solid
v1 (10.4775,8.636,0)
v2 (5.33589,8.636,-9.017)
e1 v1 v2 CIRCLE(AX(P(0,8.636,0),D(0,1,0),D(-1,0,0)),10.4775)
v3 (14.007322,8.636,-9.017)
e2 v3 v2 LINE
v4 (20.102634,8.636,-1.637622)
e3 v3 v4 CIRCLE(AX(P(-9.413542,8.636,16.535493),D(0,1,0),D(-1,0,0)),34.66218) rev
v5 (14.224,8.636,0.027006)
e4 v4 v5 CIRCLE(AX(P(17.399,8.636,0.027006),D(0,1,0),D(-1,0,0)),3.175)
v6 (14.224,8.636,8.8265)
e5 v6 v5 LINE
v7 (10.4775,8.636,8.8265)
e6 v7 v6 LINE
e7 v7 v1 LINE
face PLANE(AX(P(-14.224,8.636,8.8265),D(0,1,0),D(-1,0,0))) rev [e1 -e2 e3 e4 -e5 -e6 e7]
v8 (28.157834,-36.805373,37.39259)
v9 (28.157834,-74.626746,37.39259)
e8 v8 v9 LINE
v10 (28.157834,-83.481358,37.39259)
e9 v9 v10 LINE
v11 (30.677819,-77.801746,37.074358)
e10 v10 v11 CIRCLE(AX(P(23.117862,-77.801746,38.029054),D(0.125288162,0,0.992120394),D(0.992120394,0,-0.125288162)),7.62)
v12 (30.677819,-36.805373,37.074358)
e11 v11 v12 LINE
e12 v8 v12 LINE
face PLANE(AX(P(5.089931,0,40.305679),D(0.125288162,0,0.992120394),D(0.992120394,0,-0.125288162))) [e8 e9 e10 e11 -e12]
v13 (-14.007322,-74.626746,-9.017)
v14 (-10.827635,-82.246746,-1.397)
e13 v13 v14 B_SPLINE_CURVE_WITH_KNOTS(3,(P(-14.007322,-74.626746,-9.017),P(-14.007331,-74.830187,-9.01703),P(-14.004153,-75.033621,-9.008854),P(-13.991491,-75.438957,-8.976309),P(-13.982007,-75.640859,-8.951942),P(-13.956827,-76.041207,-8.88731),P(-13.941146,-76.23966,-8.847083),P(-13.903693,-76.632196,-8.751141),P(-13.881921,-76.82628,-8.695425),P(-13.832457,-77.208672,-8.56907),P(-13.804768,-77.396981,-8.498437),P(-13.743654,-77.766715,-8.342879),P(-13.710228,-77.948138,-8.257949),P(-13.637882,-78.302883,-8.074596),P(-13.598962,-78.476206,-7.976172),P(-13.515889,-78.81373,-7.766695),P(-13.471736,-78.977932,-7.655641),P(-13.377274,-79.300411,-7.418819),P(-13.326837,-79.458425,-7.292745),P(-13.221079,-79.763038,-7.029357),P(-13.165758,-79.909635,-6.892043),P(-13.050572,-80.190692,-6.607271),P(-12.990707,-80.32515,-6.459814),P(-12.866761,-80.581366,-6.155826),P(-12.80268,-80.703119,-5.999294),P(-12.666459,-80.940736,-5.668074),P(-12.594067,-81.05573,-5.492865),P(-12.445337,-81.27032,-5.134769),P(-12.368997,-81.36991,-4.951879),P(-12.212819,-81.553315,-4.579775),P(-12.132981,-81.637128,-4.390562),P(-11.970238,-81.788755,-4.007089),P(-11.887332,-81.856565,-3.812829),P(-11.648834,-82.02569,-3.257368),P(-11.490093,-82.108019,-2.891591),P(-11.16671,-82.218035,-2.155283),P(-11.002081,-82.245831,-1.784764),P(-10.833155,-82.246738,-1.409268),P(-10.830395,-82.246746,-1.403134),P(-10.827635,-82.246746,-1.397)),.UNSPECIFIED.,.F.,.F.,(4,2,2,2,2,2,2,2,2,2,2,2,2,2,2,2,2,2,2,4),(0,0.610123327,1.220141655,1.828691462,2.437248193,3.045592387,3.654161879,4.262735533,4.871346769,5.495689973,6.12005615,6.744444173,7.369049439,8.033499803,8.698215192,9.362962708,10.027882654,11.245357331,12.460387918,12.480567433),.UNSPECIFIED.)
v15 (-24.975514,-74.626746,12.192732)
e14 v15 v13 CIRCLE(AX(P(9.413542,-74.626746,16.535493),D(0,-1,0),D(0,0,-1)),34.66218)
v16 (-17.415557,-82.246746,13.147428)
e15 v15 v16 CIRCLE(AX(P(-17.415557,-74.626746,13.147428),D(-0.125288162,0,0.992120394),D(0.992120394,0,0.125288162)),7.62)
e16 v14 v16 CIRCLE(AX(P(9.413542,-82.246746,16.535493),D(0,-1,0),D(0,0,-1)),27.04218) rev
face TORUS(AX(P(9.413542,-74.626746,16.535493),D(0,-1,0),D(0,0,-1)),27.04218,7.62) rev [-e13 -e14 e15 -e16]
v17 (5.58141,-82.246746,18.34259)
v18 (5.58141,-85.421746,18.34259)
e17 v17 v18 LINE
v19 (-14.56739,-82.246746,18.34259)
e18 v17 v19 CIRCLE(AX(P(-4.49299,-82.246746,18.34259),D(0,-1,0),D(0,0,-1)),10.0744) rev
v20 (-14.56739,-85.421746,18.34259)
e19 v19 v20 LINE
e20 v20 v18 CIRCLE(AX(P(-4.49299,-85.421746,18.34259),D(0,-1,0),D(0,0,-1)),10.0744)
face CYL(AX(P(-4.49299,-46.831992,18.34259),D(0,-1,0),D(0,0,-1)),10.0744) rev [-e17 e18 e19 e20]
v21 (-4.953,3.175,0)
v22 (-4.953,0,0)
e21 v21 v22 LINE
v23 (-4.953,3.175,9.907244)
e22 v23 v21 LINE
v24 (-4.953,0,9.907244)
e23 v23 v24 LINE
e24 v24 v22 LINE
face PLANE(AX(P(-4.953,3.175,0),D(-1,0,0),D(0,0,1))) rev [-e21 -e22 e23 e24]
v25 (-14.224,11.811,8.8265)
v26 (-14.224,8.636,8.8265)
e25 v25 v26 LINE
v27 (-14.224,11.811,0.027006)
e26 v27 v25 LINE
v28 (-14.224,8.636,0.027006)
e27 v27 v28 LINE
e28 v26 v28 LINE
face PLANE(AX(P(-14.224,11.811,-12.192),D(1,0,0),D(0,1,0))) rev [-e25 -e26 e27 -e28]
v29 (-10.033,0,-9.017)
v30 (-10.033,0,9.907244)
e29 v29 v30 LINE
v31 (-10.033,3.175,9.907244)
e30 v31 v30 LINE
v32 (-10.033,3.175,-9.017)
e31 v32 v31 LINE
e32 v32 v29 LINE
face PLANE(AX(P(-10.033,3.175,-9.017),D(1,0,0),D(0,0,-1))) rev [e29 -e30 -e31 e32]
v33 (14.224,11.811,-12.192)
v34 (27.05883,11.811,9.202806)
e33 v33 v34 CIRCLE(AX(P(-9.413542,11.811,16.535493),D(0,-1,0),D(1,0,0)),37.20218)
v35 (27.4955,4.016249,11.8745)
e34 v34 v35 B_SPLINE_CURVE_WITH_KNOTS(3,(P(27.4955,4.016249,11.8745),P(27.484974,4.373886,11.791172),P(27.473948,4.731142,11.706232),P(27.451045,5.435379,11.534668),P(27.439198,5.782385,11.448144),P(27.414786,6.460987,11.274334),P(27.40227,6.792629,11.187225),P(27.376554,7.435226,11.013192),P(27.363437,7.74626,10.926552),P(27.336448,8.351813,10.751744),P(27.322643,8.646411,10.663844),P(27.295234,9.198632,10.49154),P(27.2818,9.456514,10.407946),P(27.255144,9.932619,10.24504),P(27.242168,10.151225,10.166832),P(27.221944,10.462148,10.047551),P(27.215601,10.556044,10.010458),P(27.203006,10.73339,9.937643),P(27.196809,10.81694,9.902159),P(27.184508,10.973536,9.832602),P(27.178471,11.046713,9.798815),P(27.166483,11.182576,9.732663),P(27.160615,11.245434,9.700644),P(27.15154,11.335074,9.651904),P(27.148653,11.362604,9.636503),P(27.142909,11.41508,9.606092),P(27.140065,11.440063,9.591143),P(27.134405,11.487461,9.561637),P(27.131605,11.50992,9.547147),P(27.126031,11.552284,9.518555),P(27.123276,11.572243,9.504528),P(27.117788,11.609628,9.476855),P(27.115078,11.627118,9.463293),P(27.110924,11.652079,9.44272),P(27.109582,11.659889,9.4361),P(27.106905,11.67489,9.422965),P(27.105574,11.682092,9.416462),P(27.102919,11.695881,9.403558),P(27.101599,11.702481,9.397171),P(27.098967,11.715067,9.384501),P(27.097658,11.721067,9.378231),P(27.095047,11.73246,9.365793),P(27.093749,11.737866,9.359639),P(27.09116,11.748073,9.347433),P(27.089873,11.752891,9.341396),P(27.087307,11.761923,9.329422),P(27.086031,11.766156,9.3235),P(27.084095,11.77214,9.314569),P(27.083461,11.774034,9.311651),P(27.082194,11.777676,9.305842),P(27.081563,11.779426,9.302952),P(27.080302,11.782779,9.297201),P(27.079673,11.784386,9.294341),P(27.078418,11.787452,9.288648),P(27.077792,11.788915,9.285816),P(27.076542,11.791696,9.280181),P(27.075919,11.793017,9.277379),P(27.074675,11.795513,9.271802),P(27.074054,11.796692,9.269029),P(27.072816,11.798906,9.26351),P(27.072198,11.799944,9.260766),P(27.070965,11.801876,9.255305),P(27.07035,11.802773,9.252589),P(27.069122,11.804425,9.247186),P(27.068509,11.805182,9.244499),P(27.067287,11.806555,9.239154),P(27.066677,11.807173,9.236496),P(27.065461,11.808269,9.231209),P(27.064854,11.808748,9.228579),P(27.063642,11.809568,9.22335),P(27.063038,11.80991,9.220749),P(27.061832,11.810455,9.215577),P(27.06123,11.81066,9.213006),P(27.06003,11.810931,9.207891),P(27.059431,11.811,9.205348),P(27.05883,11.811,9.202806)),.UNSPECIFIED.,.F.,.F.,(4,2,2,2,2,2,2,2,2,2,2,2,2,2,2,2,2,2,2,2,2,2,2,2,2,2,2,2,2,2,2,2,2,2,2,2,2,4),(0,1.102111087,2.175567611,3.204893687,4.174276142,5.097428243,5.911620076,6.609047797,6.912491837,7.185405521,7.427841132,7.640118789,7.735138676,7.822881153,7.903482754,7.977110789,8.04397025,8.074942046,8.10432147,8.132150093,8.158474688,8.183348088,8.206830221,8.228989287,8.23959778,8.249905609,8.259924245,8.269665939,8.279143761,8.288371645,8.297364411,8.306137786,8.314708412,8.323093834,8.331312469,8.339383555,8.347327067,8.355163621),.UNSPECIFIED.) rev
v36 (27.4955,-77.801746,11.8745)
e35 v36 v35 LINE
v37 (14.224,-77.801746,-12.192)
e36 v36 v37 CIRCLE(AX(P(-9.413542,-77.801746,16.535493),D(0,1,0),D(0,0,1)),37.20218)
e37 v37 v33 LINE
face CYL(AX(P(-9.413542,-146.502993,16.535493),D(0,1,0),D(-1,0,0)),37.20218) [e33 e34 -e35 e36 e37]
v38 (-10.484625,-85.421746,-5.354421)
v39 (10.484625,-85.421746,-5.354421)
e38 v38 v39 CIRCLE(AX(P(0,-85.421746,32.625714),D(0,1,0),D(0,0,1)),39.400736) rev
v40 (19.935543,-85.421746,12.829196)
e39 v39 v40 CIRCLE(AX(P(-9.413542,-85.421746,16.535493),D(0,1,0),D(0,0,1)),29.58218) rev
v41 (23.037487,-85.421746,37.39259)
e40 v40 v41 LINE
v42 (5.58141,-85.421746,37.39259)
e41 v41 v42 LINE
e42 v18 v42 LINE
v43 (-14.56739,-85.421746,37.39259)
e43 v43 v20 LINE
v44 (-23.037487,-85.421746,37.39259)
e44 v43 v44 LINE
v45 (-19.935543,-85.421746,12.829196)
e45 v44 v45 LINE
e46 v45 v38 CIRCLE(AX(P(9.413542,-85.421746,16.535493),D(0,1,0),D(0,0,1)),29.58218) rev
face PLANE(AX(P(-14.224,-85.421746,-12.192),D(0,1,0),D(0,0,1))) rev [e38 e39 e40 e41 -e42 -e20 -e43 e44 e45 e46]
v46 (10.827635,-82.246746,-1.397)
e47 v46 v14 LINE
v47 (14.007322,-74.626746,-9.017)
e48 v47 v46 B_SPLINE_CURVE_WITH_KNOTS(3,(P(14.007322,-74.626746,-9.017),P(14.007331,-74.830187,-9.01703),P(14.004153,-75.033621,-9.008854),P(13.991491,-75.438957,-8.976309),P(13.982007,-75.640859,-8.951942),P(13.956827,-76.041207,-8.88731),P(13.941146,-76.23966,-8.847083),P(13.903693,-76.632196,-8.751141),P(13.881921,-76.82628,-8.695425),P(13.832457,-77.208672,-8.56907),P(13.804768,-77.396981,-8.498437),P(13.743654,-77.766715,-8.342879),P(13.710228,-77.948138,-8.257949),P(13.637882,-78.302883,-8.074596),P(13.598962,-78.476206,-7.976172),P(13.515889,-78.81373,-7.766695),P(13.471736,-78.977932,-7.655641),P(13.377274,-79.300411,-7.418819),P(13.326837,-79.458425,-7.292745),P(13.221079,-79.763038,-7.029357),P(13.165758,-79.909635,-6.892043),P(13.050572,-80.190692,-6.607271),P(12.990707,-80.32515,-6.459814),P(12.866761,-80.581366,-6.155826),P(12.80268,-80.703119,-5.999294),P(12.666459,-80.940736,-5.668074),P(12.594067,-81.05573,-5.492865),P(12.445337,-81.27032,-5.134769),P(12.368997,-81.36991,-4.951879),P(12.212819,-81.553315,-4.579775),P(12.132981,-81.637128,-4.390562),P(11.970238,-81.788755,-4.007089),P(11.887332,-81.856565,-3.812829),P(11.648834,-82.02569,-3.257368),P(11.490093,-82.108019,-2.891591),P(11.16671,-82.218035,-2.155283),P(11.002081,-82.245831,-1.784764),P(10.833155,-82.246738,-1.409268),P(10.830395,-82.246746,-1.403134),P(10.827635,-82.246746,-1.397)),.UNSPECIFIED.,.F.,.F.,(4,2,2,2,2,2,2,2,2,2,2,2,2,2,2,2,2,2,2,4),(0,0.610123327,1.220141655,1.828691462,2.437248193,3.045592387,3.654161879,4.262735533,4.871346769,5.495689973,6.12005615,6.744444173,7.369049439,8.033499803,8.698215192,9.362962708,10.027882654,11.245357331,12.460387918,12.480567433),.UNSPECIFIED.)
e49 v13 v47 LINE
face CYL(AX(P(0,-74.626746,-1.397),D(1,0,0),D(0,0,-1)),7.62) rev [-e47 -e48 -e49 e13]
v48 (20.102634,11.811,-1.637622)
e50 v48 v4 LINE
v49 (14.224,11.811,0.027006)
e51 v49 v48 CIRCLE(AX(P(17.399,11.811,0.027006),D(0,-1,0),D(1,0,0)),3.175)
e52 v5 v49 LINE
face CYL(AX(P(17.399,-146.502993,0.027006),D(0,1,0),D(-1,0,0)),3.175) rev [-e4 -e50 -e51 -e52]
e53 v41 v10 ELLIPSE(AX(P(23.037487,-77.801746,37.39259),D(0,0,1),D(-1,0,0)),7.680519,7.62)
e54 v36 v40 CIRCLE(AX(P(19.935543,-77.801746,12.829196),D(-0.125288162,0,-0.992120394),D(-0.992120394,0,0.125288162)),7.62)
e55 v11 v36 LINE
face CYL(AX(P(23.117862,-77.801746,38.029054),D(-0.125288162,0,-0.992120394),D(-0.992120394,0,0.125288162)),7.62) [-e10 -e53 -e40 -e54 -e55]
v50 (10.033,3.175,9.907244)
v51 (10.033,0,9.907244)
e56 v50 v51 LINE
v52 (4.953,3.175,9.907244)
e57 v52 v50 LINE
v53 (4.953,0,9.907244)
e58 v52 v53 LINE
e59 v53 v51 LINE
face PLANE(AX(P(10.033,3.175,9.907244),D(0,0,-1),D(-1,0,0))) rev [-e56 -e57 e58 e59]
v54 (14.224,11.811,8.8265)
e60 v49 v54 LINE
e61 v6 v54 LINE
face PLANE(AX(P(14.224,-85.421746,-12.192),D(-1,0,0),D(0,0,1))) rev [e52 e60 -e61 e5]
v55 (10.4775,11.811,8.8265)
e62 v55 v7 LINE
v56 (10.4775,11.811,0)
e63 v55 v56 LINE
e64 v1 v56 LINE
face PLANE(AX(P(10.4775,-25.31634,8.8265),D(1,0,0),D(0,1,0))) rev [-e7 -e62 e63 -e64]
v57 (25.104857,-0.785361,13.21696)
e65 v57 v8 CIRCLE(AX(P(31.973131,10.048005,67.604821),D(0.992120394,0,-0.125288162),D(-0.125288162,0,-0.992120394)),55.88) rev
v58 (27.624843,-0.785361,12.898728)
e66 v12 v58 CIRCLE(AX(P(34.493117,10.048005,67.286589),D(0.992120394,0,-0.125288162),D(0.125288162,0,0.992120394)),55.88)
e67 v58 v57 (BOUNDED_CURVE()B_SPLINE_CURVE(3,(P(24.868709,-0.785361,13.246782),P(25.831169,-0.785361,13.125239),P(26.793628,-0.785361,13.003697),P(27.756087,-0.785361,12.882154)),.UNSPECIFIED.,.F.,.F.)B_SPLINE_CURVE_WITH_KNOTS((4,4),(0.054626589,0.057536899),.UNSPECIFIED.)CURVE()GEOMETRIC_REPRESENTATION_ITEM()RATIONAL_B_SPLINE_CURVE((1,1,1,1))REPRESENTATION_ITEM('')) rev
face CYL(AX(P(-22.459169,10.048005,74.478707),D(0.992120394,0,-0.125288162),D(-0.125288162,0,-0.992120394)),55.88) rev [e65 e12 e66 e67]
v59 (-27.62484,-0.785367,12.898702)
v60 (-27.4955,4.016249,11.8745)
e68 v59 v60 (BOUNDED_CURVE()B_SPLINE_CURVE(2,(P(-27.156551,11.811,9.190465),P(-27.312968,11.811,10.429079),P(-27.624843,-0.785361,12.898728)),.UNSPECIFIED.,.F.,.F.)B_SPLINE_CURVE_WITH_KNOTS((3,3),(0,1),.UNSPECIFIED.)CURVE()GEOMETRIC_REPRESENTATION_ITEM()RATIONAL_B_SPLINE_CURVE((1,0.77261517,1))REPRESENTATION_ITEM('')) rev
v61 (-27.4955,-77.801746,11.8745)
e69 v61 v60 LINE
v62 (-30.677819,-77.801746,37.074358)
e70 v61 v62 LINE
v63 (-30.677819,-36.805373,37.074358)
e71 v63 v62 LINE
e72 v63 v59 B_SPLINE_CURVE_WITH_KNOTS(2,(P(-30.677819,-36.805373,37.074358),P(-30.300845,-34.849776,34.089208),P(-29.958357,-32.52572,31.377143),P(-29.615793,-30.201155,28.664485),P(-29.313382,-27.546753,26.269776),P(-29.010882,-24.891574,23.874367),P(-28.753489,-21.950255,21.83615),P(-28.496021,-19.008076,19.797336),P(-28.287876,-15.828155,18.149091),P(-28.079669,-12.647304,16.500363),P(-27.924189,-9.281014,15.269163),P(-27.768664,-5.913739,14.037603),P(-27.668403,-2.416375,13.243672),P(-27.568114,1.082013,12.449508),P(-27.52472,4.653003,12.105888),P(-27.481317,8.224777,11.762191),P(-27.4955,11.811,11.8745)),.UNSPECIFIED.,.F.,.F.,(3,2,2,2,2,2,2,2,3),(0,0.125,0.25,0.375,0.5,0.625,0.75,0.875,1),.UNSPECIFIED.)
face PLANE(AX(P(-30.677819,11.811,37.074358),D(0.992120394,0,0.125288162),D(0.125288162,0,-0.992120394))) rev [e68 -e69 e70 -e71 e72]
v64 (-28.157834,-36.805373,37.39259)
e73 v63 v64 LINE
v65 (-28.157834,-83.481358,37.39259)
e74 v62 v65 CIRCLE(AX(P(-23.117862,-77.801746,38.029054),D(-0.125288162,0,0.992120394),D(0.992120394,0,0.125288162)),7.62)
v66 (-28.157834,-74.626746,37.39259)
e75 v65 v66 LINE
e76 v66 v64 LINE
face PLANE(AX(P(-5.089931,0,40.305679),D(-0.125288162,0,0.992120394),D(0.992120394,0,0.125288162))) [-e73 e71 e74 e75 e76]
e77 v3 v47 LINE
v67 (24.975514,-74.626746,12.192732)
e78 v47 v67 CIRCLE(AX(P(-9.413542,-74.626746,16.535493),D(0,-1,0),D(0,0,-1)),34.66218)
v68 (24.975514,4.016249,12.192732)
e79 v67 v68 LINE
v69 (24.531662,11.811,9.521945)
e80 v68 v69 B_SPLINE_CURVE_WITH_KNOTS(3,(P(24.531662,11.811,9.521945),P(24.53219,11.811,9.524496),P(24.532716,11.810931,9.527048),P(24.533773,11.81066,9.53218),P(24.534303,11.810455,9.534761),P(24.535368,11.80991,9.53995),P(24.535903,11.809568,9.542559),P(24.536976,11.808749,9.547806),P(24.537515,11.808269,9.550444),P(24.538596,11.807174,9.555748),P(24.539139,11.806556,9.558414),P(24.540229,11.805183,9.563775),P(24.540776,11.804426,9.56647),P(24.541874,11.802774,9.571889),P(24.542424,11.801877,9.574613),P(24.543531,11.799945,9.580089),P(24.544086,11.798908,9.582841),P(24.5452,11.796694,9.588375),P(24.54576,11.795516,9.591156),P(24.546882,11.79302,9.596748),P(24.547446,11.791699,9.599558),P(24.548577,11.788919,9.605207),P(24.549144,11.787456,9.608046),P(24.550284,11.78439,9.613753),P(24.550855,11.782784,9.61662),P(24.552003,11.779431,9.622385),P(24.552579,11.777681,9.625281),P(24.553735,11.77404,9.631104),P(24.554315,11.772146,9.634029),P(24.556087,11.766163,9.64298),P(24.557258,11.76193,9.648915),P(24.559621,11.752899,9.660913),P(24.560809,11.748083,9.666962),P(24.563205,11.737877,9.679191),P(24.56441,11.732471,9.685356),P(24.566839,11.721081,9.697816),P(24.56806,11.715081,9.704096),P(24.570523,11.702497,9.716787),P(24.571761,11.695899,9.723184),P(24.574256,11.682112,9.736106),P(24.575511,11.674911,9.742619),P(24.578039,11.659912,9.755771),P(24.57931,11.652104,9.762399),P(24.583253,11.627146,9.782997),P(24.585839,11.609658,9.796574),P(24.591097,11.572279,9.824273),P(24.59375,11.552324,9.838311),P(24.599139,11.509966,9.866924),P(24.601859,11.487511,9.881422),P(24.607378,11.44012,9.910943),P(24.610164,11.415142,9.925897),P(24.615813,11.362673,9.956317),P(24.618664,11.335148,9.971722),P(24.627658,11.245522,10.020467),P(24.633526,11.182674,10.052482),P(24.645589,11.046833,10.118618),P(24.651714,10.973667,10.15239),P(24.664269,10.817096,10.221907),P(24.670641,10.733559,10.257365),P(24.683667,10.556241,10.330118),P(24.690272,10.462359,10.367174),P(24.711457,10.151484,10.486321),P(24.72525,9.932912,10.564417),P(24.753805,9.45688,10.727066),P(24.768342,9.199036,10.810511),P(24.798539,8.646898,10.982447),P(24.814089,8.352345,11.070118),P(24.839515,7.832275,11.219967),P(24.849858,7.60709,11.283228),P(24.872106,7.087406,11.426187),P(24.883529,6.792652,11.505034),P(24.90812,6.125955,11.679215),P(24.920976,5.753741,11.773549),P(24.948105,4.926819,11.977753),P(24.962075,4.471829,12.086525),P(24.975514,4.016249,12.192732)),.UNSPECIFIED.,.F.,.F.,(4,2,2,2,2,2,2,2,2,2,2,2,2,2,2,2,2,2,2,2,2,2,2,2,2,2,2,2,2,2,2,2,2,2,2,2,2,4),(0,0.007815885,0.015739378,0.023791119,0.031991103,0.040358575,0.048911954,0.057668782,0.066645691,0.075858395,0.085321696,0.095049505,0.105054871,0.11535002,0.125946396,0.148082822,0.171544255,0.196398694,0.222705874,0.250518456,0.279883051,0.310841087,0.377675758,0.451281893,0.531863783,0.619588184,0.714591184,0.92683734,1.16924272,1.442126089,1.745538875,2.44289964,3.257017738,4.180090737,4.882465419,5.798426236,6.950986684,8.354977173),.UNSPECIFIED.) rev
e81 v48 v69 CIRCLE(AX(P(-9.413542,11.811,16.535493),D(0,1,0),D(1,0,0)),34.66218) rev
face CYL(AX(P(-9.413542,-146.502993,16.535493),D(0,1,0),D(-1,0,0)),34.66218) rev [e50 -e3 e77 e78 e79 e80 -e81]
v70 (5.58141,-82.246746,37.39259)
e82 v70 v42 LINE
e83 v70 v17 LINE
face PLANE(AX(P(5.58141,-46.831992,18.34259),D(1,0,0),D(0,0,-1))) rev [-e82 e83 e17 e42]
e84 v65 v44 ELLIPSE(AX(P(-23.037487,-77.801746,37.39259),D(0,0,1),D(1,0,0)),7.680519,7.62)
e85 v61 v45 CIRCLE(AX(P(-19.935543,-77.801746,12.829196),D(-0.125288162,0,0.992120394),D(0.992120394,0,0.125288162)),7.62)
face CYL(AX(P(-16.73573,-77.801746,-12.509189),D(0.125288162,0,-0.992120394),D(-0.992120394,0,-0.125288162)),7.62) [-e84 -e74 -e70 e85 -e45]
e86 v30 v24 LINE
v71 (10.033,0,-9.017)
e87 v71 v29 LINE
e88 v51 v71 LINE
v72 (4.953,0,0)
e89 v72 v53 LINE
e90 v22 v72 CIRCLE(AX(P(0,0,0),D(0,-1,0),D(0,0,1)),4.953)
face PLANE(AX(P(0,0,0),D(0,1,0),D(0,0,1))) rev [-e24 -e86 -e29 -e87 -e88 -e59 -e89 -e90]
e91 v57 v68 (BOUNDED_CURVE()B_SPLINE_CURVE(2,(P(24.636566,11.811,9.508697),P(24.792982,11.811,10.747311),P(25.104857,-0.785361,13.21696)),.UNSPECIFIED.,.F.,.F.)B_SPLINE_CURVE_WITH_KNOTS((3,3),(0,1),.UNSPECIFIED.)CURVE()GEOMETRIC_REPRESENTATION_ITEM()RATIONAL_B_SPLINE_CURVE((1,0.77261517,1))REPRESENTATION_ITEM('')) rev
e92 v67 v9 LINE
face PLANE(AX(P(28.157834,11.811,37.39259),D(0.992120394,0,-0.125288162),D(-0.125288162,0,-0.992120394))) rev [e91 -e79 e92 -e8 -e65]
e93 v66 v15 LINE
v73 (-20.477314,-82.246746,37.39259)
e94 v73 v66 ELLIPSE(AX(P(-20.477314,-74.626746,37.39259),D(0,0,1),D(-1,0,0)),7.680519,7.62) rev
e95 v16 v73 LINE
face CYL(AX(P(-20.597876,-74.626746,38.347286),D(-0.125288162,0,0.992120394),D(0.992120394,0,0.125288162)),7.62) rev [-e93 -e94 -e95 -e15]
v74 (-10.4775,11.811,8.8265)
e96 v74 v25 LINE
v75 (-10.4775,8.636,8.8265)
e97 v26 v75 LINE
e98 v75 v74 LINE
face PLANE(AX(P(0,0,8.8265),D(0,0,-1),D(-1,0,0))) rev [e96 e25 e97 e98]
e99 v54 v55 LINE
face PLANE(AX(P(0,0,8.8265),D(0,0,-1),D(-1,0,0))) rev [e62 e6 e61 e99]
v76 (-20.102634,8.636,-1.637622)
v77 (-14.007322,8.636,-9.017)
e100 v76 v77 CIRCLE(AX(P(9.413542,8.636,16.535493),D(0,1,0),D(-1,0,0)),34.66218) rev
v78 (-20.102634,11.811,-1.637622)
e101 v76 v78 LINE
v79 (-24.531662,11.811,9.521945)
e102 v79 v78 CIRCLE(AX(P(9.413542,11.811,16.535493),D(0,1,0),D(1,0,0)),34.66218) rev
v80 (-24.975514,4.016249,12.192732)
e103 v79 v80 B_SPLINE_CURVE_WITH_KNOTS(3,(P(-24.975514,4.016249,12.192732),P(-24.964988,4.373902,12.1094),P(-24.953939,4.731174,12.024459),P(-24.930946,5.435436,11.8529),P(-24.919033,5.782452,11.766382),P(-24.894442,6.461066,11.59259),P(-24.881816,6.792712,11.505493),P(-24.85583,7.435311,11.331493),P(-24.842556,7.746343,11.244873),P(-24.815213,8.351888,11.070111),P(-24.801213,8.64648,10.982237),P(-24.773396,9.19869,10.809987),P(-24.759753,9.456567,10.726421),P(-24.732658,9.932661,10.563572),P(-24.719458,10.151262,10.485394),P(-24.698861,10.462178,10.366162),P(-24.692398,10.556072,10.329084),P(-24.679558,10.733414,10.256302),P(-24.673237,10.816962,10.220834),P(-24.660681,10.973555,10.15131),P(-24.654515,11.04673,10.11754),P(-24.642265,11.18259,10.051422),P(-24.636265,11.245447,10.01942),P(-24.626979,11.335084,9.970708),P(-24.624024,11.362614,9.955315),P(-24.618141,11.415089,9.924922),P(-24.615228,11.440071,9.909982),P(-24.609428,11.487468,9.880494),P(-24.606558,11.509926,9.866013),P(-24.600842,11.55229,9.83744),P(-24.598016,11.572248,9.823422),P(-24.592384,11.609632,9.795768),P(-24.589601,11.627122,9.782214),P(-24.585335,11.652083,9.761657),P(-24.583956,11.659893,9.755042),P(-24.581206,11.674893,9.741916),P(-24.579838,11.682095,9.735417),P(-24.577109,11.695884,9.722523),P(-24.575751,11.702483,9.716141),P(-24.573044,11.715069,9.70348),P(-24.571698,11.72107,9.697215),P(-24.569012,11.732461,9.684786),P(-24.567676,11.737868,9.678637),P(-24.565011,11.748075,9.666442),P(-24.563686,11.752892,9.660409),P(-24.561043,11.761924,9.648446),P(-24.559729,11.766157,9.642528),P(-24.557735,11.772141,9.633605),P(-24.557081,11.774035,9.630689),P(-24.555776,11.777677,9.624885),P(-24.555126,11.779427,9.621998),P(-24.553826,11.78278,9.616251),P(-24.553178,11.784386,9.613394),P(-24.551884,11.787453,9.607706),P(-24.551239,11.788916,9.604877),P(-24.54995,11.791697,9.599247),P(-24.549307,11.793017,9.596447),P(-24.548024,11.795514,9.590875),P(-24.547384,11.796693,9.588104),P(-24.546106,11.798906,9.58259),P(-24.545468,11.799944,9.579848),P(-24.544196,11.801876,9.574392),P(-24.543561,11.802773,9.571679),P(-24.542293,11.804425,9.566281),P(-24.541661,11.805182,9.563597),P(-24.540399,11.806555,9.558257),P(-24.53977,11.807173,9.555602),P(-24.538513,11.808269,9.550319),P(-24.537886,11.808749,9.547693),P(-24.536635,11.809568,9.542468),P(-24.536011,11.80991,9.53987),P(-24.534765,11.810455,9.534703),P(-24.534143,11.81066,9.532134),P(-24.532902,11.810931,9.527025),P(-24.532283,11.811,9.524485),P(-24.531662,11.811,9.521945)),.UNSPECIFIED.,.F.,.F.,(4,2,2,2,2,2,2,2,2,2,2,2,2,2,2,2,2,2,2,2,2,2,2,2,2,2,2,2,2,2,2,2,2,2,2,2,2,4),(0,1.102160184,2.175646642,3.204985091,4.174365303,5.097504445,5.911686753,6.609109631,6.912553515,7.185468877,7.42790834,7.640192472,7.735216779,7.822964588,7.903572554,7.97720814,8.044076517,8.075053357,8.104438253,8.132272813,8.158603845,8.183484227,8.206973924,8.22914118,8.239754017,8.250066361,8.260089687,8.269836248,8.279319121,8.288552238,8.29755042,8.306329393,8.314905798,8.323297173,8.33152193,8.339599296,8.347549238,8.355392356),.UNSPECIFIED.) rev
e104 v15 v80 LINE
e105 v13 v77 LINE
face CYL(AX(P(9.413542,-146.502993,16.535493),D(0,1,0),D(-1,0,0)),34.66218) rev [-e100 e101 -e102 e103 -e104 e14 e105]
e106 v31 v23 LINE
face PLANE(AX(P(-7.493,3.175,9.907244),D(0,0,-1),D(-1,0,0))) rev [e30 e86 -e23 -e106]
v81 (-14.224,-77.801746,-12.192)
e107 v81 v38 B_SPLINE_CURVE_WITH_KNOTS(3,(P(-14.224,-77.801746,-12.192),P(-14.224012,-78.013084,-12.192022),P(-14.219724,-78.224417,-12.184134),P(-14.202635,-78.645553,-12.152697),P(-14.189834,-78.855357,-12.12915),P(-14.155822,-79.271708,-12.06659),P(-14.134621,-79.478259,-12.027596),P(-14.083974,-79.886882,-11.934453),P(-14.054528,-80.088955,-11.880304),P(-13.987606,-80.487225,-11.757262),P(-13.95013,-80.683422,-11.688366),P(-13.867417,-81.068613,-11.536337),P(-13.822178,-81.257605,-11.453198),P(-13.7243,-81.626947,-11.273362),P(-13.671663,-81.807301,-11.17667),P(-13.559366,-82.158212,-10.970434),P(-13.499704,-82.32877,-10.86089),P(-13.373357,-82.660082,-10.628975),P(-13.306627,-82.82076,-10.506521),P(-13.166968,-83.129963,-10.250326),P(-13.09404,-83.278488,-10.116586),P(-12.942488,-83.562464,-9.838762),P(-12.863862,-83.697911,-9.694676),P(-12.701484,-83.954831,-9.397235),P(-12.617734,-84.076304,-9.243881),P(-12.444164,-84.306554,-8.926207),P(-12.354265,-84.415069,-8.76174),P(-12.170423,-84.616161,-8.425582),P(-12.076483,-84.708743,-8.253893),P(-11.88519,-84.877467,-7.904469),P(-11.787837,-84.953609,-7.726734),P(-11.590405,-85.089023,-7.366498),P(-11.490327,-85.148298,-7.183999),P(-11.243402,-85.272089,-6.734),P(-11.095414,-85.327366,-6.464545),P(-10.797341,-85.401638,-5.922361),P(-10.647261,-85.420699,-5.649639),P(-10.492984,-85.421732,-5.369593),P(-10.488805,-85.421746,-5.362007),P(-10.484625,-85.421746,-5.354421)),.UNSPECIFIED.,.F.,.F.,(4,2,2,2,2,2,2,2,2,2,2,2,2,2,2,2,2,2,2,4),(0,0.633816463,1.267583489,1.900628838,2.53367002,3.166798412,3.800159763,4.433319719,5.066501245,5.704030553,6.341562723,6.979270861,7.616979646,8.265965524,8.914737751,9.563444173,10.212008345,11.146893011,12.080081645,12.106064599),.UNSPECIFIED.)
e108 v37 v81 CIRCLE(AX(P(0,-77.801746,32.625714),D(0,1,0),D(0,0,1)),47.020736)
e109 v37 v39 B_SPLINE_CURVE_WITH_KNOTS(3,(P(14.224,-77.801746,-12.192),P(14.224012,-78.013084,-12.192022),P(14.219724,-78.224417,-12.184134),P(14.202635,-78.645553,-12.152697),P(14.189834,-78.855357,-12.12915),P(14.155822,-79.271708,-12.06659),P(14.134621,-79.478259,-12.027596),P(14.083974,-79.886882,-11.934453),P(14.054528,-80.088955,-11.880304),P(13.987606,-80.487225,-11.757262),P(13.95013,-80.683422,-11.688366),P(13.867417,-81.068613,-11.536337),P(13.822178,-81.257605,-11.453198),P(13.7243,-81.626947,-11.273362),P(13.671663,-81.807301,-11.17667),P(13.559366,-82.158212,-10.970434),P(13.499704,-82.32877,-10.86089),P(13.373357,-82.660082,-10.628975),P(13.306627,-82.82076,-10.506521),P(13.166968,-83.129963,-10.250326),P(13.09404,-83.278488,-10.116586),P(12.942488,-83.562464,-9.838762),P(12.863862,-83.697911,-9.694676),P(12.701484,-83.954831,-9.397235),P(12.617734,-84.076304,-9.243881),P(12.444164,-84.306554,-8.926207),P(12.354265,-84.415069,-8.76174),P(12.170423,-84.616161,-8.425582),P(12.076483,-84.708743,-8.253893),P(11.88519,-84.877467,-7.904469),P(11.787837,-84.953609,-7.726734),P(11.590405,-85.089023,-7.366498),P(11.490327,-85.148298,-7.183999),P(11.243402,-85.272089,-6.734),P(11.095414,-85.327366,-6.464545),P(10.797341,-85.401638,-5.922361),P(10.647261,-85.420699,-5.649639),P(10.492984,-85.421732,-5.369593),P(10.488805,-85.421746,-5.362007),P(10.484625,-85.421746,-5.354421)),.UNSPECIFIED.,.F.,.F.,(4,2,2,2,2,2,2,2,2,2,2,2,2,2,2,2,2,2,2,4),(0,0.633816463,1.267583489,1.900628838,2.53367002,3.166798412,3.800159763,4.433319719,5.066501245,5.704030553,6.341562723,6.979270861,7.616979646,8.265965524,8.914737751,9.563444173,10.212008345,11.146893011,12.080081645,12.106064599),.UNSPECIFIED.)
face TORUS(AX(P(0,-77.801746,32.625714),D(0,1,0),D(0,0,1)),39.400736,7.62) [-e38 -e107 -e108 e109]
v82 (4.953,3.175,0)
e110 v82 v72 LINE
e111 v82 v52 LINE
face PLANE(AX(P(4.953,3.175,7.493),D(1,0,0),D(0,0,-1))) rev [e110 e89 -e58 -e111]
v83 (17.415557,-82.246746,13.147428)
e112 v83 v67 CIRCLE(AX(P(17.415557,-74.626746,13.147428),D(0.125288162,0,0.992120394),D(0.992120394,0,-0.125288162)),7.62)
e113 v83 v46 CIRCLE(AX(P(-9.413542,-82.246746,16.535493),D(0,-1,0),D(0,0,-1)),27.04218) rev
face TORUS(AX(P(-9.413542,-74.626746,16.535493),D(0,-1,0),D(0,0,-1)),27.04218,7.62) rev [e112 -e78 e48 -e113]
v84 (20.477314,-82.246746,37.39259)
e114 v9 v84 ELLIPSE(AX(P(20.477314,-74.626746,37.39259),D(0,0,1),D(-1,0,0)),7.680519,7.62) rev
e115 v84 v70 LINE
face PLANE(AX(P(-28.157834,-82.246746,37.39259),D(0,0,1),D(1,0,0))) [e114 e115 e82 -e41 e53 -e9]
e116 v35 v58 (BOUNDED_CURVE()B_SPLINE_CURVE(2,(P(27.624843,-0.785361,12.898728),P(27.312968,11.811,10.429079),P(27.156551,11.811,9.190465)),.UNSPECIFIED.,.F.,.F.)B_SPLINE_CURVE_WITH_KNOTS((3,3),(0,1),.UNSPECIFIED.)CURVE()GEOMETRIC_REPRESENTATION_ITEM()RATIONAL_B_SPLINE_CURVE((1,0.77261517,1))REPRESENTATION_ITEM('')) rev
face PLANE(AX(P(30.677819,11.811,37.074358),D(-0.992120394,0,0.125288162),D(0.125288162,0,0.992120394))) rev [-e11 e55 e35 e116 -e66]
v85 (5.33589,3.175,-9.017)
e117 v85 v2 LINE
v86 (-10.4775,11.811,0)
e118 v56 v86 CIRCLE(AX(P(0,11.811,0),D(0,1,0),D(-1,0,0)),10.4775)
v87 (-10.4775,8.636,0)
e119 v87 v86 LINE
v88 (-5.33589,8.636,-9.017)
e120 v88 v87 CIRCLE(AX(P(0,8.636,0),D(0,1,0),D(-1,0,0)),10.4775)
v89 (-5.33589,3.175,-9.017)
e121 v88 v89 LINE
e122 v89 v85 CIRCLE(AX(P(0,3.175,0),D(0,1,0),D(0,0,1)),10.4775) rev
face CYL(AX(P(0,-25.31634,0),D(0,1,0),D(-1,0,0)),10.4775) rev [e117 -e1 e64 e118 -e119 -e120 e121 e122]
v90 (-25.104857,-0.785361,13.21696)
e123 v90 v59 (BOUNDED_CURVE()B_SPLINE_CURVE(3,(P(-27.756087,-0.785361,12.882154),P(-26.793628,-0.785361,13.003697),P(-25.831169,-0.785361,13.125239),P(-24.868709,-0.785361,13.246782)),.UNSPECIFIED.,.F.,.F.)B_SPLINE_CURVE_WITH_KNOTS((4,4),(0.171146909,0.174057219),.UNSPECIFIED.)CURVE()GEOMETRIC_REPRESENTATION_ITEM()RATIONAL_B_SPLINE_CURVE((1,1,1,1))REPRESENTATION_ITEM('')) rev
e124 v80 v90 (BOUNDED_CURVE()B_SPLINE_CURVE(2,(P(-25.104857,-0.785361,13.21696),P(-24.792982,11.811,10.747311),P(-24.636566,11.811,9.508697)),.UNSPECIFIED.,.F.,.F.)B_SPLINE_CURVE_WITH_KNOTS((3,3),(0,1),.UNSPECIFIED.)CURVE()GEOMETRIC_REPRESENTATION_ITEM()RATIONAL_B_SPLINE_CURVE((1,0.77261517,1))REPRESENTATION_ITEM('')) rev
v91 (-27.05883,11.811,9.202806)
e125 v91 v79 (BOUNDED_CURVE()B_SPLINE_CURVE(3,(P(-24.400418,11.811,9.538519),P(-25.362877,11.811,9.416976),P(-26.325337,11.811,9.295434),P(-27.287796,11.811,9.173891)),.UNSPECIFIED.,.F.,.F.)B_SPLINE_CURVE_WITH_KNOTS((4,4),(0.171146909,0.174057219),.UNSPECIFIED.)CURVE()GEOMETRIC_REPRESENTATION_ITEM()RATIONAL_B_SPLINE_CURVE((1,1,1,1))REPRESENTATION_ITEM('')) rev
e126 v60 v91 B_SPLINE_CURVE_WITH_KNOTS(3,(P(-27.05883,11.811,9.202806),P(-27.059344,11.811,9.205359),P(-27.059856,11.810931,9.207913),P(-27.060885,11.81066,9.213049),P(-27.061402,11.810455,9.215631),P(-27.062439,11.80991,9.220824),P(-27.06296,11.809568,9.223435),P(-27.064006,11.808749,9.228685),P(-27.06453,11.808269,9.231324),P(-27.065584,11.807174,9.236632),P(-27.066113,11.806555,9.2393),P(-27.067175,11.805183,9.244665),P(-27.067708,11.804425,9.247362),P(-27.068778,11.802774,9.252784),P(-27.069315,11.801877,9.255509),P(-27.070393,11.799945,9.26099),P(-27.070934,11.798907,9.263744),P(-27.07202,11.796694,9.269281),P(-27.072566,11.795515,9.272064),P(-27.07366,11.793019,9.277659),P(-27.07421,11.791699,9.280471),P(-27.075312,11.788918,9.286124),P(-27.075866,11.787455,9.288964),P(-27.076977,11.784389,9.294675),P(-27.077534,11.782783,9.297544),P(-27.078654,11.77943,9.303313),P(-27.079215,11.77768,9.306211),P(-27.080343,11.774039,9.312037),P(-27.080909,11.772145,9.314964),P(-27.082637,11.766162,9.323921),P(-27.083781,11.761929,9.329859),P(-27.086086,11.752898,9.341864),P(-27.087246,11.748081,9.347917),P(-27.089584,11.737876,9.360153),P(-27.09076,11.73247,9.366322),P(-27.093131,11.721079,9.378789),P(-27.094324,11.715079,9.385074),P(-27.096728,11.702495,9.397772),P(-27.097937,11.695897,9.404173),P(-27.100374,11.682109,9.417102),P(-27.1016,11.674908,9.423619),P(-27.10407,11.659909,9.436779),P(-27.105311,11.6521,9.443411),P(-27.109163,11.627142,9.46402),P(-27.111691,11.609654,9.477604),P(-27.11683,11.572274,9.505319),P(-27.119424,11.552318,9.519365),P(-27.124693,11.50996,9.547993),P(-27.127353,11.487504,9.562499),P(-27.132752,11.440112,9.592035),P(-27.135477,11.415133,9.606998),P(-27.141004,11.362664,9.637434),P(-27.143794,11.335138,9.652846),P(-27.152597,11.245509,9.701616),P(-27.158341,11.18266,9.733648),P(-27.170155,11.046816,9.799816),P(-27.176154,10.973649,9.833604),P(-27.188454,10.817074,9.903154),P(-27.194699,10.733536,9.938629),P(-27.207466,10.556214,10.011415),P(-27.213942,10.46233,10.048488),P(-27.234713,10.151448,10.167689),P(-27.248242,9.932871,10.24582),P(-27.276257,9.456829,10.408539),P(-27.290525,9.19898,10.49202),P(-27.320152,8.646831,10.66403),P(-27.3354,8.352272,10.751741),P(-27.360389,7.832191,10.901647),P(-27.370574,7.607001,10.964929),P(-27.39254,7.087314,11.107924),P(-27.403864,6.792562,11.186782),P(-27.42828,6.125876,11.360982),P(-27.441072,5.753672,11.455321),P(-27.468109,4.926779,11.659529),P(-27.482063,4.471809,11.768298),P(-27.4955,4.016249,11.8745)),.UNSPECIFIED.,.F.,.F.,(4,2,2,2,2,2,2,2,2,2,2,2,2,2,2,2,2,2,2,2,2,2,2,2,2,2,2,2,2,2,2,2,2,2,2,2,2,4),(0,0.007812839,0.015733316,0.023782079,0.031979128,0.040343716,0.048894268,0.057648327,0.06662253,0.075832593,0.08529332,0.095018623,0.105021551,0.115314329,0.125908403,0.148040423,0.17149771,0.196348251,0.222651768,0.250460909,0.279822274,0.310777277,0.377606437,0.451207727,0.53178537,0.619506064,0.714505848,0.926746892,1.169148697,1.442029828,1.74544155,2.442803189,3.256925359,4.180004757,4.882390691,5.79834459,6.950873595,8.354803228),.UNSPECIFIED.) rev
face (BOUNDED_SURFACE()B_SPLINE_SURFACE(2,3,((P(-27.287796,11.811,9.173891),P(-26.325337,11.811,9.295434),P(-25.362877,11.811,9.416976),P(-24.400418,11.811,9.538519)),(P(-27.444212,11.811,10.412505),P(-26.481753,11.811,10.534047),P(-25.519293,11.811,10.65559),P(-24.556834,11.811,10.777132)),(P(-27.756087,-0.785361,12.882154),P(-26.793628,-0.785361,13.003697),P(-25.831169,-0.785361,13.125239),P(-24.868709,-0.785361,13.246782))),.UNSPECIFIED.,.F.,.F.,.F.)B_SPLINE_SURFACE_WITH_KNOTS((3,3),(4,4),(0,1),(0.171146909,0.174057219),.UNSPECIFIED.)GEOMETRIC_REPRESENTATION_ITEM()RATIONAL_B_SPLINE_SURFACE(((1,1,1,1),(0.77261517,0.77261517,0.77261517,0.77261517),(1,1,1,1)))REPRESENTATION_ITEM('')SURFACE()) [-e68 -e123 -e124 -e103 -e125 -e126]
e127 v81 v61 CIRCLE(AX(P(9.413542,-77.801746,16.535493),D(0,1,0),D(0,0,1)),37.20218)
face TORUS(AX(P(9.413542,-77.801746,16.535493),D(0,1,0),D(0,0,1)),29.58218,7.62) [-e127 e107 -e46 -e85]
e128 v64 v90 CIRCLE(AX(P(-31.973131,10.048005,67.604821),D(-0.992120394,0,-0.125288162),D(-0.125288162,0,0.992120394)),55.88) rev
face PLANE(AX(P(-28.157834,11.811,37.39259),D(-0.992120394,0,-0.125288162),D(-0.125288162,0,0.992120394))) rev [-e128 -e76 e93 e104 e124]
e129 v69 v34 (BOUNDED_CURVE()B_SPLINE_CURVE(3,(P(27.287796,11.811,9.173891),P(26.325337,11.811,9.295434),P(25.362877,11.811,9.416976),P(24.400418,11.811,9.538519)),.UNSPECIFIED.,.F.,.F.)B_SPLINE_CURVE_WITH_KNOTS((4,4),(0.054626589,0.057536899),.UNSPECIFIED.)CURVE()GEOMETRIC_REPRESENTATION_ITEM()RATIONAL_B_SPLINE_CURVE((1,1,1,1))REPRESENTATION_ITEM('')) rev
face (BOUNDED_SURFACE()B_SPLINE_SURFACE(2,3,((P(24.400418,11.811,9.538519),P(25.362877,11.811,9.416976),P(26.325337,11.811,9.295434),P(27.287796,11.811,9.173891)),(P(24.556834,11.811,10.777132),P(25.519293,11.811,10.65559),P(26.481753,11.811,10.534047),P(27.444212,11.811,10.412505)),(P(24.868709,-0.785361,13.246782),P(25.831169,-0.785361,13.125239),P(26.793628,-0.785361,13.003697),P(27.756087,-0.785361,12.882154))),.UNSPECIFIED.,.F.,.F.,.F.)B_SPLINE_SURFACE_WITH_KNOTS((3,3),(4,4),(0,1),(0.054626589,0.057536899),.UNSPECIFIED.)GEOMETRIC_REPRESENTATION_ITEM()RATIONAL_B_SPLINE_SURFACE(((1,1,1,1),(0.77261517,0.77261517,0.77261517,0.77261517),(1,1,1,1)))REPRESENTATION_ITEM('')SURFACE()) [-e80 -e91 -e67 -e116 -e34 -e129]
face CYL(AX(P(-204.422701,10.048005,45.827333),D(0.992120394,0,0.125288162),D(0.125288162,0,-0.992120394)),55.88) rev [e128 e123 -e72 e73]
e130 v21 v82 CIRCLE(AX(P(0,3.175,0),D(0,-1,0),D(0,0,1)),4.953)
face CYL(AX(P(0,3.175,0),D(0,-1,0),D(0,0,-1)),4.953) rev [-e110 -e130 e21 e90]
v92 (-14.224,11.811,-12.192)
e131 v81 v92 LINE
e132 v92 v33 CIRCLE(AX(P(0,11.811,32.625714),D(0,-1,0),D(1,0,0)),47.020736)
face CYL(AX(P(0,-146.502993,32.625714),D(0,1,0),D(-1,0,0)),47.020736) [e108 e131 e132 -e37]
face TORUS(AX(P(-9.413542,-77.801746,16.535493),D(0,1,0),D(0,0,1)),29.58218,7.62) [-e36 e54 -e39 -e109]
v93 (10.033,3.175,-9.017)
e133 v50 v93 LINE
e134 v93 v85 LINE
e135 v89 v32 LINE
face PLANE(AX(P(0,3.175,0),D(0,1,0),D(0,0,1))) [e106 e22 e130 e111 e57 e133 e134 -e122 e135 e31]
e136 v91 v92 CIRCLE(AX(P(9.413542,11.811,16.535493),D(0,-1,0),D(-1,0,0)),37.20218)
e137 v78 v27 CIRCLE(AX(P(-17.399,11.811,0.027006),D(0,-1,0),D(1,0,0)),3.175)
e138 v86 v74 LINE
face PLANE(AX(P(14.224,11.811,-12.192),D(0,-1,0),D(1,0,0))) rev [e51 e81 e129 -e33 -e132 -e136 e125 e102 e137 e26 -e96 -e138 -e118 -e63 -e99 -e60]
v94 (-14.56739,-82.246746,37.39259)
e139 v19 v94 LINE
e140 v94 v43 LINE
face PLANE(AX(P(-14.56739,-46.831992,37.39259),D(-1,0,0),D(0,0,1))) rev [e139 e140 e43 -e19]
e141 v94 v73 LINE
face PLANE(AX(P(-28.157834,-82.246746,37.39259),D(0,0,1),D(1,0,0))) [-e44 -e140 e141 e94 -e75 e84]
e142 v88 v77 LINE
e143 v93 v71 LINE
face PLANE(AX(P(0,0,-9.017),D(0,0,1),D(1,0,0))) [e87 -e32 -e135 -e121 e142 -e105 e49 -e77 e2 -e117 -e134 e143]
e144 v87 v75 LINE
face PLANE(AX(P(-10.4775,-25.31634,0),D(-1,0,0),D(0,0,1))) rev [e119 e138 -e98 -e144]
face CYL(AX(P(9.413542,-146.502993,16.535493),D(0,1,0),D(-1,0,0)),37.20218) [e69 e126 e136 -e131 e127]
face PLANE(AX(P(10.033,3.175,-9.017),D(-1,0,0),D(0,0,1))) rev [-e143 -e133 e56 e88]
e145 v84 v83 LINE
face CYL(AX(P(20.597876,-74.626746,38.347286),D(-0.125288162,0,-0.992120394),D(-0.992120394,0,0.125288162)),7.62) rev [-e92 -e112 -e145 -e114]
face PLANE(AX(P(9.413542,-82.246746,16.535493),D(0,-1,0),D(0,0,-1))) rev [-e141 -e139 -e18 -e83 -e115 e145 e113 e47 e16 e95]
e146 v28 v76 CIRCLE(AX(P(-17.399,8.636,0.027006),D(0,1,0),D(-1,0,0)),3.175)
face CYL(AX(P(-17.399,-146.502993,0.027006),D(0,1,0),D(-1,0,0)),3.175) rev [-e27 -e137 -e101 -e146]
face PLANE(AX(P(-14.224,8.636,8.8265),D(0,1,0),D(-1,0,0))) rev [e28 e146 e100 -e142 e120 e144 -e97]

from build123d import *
from build123d.topology import SkipClean

# Parameters (mm, degrees)
BOSS_EXTRUDE1_DEPTH     = 3.175
BOSS_EXTRUDE2_DEPTH     = 3.175
BOSS_EXTRUDE3_DEPTH     = 21.0185
CUT_EXTRUDE1_START      = -8.636
CUT_EXTRUDE1_DEPTH      = 8.636
EXTRUDE_THIN2_START     = -97.232746
EXTRUDE_THIN2_DEPTH     = 97.232746
FILLET3_R               = 3.175
BOSS_EXTRUDE6_DEPTH     = 3.175
BOSS_EXTRUDE7_DEPTH     = 25.4
BOSS_EXTRUDE8_DEPTH     = 25.4
CUT_EXTRUDE2_START      = -2.540011
CUT_EXTRUDE2_DEPTH      = 2.540011
CUT_EXTRUDE3_DEPTH      = 111.05910553505677
CUT_EXTRUDE3_DEPTH_BACK = 10.921999999999981
BOSS_EXTRUDE10_DEPTH    = 3.175
CUT_EXTRUDE6_DEPTH      = 3.175
FILLET9_R               = 7.62
FILLET10_R              = 7.62


with BuildPart() as part:
    # Sketch1 → Boss-Extrude1 (new body)
    with BuildSketch(Plane(origin=(0, 0, 0), x_dir=(1, 0, 0), z_dir=(0, 1, 0))):
        with BuildLine():
            Line((-7.493000000000001, 9.017), (7.493000000000001, 9.017))
            Line((7.493000000000001, 9.017), (10.033000000000001, 9.017))
            Line((10.033000000000001, 9.017), (10.033000000000003, -9.907244149147685))
            Line((10.033000000000003, -9.907244149147685), (7.493000000000001, -9.907244149147685))
            Line((7.493000000000001, -9.907244149147685), (4.953000000000001, -9.907244149147685))
            Line((4.953000000000001, -9.907244149147685), (4.953000000000001, -7.493000000000001))
            Line((4.953000000000001, -7.493000000000001), (4.953000000000002, 0))
            ThreePointArc((4.953000000000002, 0), (3e-16, 4.953000000000002), (-4.953000000000002, 0))
            Line((-4.953000000000002, 0), (-4.953000000000002, -7.493000000000001))
            Line((-4.953000000000002, -7.493000000000001), (-4.953000000000002, -9.907244149147685))
            Line((-4.953000000000002, -9.907244149147685), (-7.493000000000001, -9.907244149147685))
            Line((-7.493000000000001, -9.907244149147685), (-10.033, -9.907244149147685))
            Line((-10.033, -9.907244149147685), (-10.033, 9.017))
            Line((-10.033, 9.017), (-7.493000000000001, 9.017))
        make_face()
    extrude(amount=BOSS_EXTRUDE1_DEPTH)

    # Sketch2 → Boss-Extrude2 (add)
    with BuildSketch(Plane(origin=(0, 0, -9.017), x_dir=(-1, 0, 0), z_dir=(0, 0, -1))):
        Polygon((-14.224, 11.811000000000002), (14.224, 11.810999999999998), (14.224000000000013, -85.42174573001641), (-14.224, -85.42174573001641), align=None)
    extrude(amount=BOSS_EXTRUDE2_DEPTH)

    # Sketch6 → Boss-Extrude3 (add)
    with BuildSketch(Plane.XY.offset(-12.191999999999998)):
        Polygon((-14.224000000000013, 11.810999999999998), (14.224000000000002, 11.811000000000002), (14.224000000000002, 8.635999999999997), (-14.224000000000013, 8.636), align=None)
    extrude(amount=BOSS_EXTRUDE3_DEPTH)

    # Sketch7 → Cut-Extrude1 (cut)
    with BuildSketch(Plane(origin=(-1.44e-15, 11.811, 0), x_dir=(1, 1.2e-16, -1.2e-16), z_dir=(-1.2e-16, 1, 0)).offset(CUT_EXTRUDE1_START)):
        with BuildLine():
            Line((-10.4775, 0), (-10.477499999999997, -8.826500000000003))
            Line((-10.477499999999997, -8.826500000000003), (10.477499999999997, -8.826500000000003))
            Line((10.477499999999997, -8.826500000000003), (10.4775, 0))
            ThreePointArc((10.4775, 0), (6.4e-16, 10.4775), (-10.4775, 0))
        make_face()
    extrude(amount=CUT_EXTRUDE1_DEPTH, mode=Mode.SUBTRACT)

    # Sketch9 → Extrude-Thin2 (add)
    with SkipClean():  # the faces are left unmerged after this step: merging them gives an invalid solid
        with BuildSketch(Plane(origin=(-1.44e-15, 11.811, 0), x_dir=(1, 1.2e-16, 0), z_dir=(-1.2e-16, 1, 0)).offset(EXTRUDE_THIN2_START)):
            with BuildLine():
                ThreePointArc((-27.495499999999996, -11.874500000000001), (-23.16361739518542, 1.4292204105375994), (-14.223999999999998, 12.191999999999998))
                ThreePointArc((-14.223999999999998, 12.191999999999998), (5.6e-15, 14.3950225515744), (14.224000000000002, 12.191999999999998))
                ThreePointArc((14.224000000000002, 12.191999999999998), (23.163617395185135, 1.4292204105374466), (27.495500000000003, -11.874500000000001))
                Line((27.495500000000003, -11.874500000000001), (24.975514198736292, -12.192731930247863))
                ThreePointArc((24.975514198736292, -12.192731930247863), (21.05665610983997, -0.0117588049320041), (12.985378631165648, 9.917391957485702))
                ThreePointArc((12.985378631165648, 9.917391957485702), (-2.419e-14, 11.8550225515744), (-12.985378631165693, 9.917391957485693))
                ThreePointArc((-12.985378631165693, 9.917391957485693), (-21.05665610984024, -0.01175880493180514), (-24.97551419873627, -12.192731930247744))
                Line((-24.97551419873627, -12.192731930247744), (-27.495499999999996, -11.874500000000001))
            make_face()
        extrude(amount=EXTRUDE_THIN2_DEPTH)

    # Fillet3
    fillet3_edges = [part.edges().sort_by_distance(p)[0] for p in [
        (14.223999999999988, 10.223500000000001, -8.81669380630742),
        (-14.224000000000025, 10.223500000000001, -8.81669380630752),
    ]]
    fillet(fillet3_edges, radius=FILLET3_R)

    # Sketch14 → Boss-Extrude6 (add)
    with SkipClean():  # the faces are left unmerged after this step: merging them gives an invalid solid
        with BuildSketch(Plane.XZ.offset(85.42174573001641)):
            with BuildLine():
                Line((-24.97551419873624, 12.192731930247724), (24.975514198736285, 12.19273193024785))
                ThreePointArc((24.975514198736285, 12.19273193024785), (21.375415433357674, 0.6135941010343018), (14.007321972391798, -9.017000000000001))
                Line((14.007321972391798, -9.017000000000001), (-14.007321972391907, -9.017000000000001))
                ThreePointArc((-14.007321972391907, -9.017000000000001), (-21.3754154333579, 0.613594101034149), (-24.97551419873624, 12.192731930247724))
            make_face()
        extrude(amount=-BOSS_EXTRUDE6_DEPTH)

    # Sketch16 → Boss-Extrude7 (add)
    with SkipClean():  # the faces are left unmerged after this step: merging them gives an invalid solid
        with BuildSketch(Plane(origin=(-1.907611771170577, -2.3e-16, 15.10582100900744), x_dir=(0.9921203941983182, 1.3600232051658164e-15, 0.125288161514861), z_dir=(-0.125288161514861, 0, 0.9921203941983182))):
            Polygon((-25.79111202477162, 11.811000000000032), (-23.25111202477174, 11.811000000000032), (-23.25111202477173, -85.42174573001638), (-25.791112024771614, -85.42174573001638), align=None)
        extrude(amount=BOSS_EXTRUDE7_DEPTH)

    # Sketch17 → Boss-Extrude8 (add)
    with SkipClean():  # the faces are left unmerged after this step: merging them gives an invalid solid
        with BuildSketch(Plane(origin=(1.9076117711714262, 2.3e-16, 15.105821009008544), x_dir=(0.9921203941983123, 0, -0.12528816151490688), z_dir=(0.12528816151490688, 0, 0.9921203941983123))):
            Polygon((23.251112024770936, 11.811000000000003), (25.791112024770936, 11.811000000000003), (25.791112024770946, -85.42174573001641), (23.251112024770947, -85.42174573001641), align=None)
        extrude(amount=BOSS_EXTRUDE8_DEPTH)

    # Sketch18 → Cut-Extrude2 (cut)
    with SkipClean():  # the faces are left unmerged after this step: merging them gives an invalid solid
        with BuildSketch(Plane(origin=(25.587888228828575, 2.68e-15, -3.2313210090085582), x_dir=(-0.12528816151490693, 0, -0.9921203941983123), z_dir=(0.9921203941983123, 0, -0.12528816151490693)).offset(CUT_EXTRUDE2_START)):
            with BuildLine():
                Line((-15.225794265840976, 11.811000000000003), (-40.62579426584097, 11.810999999999979))
                Line((-40.62579426584097, 11.810999999999979), (-40.625794265840945, -36.80537286500823))
                ThreePointArc((-40.625794265840945, -36.80537286500823), (-21.550219024017473, -15.828155025985357), (-15.225794265840976, 11.811000000000003))
            make_face()
        extrude(amount=CUT_EXTRUDE2_DEPTH, mode=Mode.SUBTRACT)

    # Sketch20 → Cut-Extrude3 (cut, two sides: drawn at the far end of the back side and taken through both)
    with SkipClean():  # the faces are left unmerged after this step: merging them gives an invalid solid
        with BuildSketch(Plane(origin=(-25.58788822882942, -3.721e-14, -3.2313210090074618), x_dir=(-0.125288161514861, 0, 0.9921203941983182), z_dir=(-0.9921203941983182, -1.4485191631463195e-15, -0.125288161514861)).offset(-CUT_EXTRUDE3_DEPTH_BACK)):
            with BuildLine():
                Line((22.0274881860901, 227.29057678360587), (15.225794265839772, 11.811000000000037))
                ThreePointArc((15.225794265839772, 11.811000000000037), (21.550219024016272, -15.828155025985314), (40.62579426583977, -36.8053728650082))
                Line((40.62579426583977, -36.8053728650082), (221.38768427622742, -154.29090461636542))
                Line((221.38768427622742, -154.29090461636542), (603.5471555949496, 45.37126677696938))
                Line((603.5471555949496, 45.37126677696938), (404.18695950481225, 426.95274817694064))
                Line((404.18695950481225, 426.95274817694064), (22.0274881860901, 227.29057678360587))
            make_face()
        extrude(amount=CUT_EXTRUDE3_DEPTH + CUT_EXTRUDE3_DEPTH_BACK, mode=Mode.SUBTRACT)

    # Fillet4
    # an asymmetric fillet: 13.335, 3.81 mm, written as the material it takes off along each edge
    with BuildSketch(Plane(origin=(58.84302061341704, 11.811000000000007, 7.915834047084794), x_dir=(-0.12528816151490632, 0, -0.9921203941983124), z_dir=(-0.9921203941983124, 0, 0.12528816151490632))) as fillet4_piece_1:
        with BuildLine():
            Bezier((2.7053520070494255, 0), (1.4569009522956595, 0), (-1.0323629375475052, 12.596361392197306), weights=[1, 0.7726151697313755, 1])
            ThreePointArc((-1.0323629375475052, 12.596361392197306), (-0.15891459016591844, 6.327461301251529), (0, 0))
            Line((0, 0), (2.7053520070494255, 0))
        make_face()
    extrude(amount=65.73297697483088, mode=Mode.SUBTRACT)
    with BuildSketch(Plane(origin=(6.372006414680967, 11.811, 16.151397883161476), x_dir=(0.12528816151485953, 0, -0.9921203941983183), z_dir=(-0.9921203941983183, 0, -0.12528816151485953))) as fillet4_piece_2:
        with BuildLine():
            Bezier((2.7053520070494144, 0), (1.4569009522956617, 0), (-1.0323629375475112, 12.596361392197299), weights=[1, 0.7726151697313756, 1])
            ThreePointArc((-1.0323629375475112, 12.596361392197299), (-0.1589145901659224, 6.327461301251536), (0, 0))
            Line((0, 0), (2.7053520070494144, 0))
        make_face()
    extrude(amount=65.7329769748309, mode=Mode.SUBTRACT)

    # Sketch24 → Boss-Extrude10 (add)
    with SkipClean():  # the faces are left unmerged after this step: merging them gives an invalid solid
        with BuildSketch(Plane.XZ.offset(85.42174573001641)):
            Polygon((-28.15783350121368, 37.39258994288504), (28.157833501214938, 37.392589942884996), (24.975514198736303, 12.192731930247856), (-24.975514198736246, 12.192731930247751), align=None)
        extrude(amount=-BOSS_EXTRUDE10_DEPTH)

    # Sketch26 → Cut-Extrude6 (cut)
    with SkipClean():  # the faces are left unmerged after this step: merging them gives an invalid solid
        with BuildSketch(Plane.XZ.offset(85.42174573001641)):
            with BuildLine():
                Line((-14.567389511213682, 37.392589942884996), (-14.56738951121368, 18.342589942884995))
                ThreePointArc((-14.56738951121368, 18.342589942884995), (-13.658413539575372, 14.16066011195614), (-11.095512732064424, 10.733370529984954))
                ThreePointArc((-11.095512732064424, 10.733370529984954), (-0.31106002656321863, 9.177166260801702), (5.581409796229526, 18.342589942884995))
                Line((5.581409796229526, 18.342589942884995), (5.581409796229526, 37.392589942884996))
                Line((5.581409796229526, 37.392589942884996), (-14.567389511213682, 37.392589942884996))
            make_face()
        extrude(amount=-CUT_EXTRUDE6_DEPTH, mode=Mode.SUBTRACT)

    # Fillet9
    # the kernel refuses this fillet: 7.62 mm, written as the material it takes off along each edge
    with BuildSketch(Plane(origin=(-27.49549999999986, -85.42174573001641, 11.8745), x_dir=(-1.4e-15, 1, -2.2e-16), z_dir=(-0.12528816151486097, 0, 0.9921203941983181))) as fillet9_piece_1:
        with BuildLine():
            CenterArc((FILLET9_R, -FILLET9_R), FILLET9_R, 90.00000000000003, 90)
            Line((3.41e-15, -FILLET9_R), (0, 0))
            Line((0, 0), (FILLET9_R, 0))
        make_face()
    extrude(amount=44.45000000000002, mode=Mode.SUBTRACT)
    with BuildSketch(Plane(origin=(9.413541961032127, -85.42174600000001, 16.535492796453063), x_dir=(-0.9921203941983183, 0, -0.12528816151485989), z_dir=(-0.12528816151485989, 0, 0.9921203941983183))) as fillet9_piece_2:
        with BuildLine():
            CenterArc((37.20218047816306 - FILLET9_R, -FILLET9_R), FILLET9_R, 0, 89.99999999999997)
            Line((37.20218047816306 - FILLET9_R, 0), (37.20218047816306, 0))
            Line((37.20218047816306, 0), (37.20218047816306, -FILLET9_R))
        make_face()
    revolve(axis=Axis((9.413541961032127, -85.42174600000001, 16.535492796453063), (1.2e-16, -1, 0)), revolution_arc=72.69638640364694, mode=Mode.SUBTRACT)
    with BuildSketch(Plane(origin=(1.219e-14, -85.42174600000001, 32.62571362170871), x_dir=(-0.6537161623893962, 0, -0.7567398357631774), z_dir=(-0.7567398357631774, 0, 0.6537161623893962))) as fillet9_piece_3:
        with BuildLine():
            CenterArc((47.020736173283105 - FILLET9_R, -FILLET9_R), FILLET9_R, 0, 90.00000000000006)
            Line((47.020736173283105 - FILLET9_R, 0), (47.020736173283105, 0))
            Line((47.020736173283105, 0), (47.02073617328311, -FILLET9_R))
        make_face()
    revolve(axis=Axis((1.219e-14, -85.42174600000001, 32.62571362170871), (1.2e-16, -1, 0)), revolution_arc=81.64474825482282, mode=Mode.SUBTRACT)
    with BuildSketch(Plane(origin=(-9.4135419610362, -85.42174600000001, 16.53549279645533), x_dir=(0.17547354297009532, 0, -0.984484147011785), z_dir=(-0.984484147011785, 0, -0.17547354297009532))) as fillet9_piece_4:
        with BuildLine():
            CenterArc((37.202180478167406 - FILLET9_R, -FILLET9_R), FILLET9_R, 0, 90)
            Line((37.202180478167406 - FILLET9_R, 0), (37.202180478167406, 0))
            Line((37.202180478167406, 0), (37.202180478167406, -FILLET9_R))
        make_face()
    revolve(axis=Axis((-9.4135419610362, -85.42174600000001, 16.53549279645533), (1.2e-16, -1, 0)), revolution_arc=72.69638640363817, mode=Mode.SUBTRACT)
    with BuildSketch(Plane(origin=(27.49550000000001, -85.42174573001641, 11.874499999999987), x_dir=(-4.6e-16, 1, 3e-17), z_dir=(0.12528816151490688, 0, 0.9921203941983123))) as fillet9_piece_5:
        with BuildLine():
            CenterArc((FILLET9_R, FILLET9_R), FILLET9_R, 179.99999999999994, 90)
            Line((1.774e-14, FILLET9_R), (0, 0))
            Line((0, 0), (FILLET9_R, 0))
        make_face()
    extrude(amount=44.450000000000045, mode=Mode.SUBTRACT)

    # Fillet10
    fillet10_edges = [part.edges().sort_by_distance(p)[0] for p in [
        (21.37541543335767, -82.24674573001641, 0.6135941010343018),
        (-26.566673849974965, -82.24674573001641, 24.792660936566392),
        (-21.3754154333579, -82.24674573001641, 0.6135941010341472),
        (-5.507e-14, -82.24674573001641, -9.017000000000001),
        (26.56667384997562, -82.24674573001641, 24.792660936566424),
    ]]
    fillet(fillet10_edges, radius=FILLET10_R)


solid = part.part
